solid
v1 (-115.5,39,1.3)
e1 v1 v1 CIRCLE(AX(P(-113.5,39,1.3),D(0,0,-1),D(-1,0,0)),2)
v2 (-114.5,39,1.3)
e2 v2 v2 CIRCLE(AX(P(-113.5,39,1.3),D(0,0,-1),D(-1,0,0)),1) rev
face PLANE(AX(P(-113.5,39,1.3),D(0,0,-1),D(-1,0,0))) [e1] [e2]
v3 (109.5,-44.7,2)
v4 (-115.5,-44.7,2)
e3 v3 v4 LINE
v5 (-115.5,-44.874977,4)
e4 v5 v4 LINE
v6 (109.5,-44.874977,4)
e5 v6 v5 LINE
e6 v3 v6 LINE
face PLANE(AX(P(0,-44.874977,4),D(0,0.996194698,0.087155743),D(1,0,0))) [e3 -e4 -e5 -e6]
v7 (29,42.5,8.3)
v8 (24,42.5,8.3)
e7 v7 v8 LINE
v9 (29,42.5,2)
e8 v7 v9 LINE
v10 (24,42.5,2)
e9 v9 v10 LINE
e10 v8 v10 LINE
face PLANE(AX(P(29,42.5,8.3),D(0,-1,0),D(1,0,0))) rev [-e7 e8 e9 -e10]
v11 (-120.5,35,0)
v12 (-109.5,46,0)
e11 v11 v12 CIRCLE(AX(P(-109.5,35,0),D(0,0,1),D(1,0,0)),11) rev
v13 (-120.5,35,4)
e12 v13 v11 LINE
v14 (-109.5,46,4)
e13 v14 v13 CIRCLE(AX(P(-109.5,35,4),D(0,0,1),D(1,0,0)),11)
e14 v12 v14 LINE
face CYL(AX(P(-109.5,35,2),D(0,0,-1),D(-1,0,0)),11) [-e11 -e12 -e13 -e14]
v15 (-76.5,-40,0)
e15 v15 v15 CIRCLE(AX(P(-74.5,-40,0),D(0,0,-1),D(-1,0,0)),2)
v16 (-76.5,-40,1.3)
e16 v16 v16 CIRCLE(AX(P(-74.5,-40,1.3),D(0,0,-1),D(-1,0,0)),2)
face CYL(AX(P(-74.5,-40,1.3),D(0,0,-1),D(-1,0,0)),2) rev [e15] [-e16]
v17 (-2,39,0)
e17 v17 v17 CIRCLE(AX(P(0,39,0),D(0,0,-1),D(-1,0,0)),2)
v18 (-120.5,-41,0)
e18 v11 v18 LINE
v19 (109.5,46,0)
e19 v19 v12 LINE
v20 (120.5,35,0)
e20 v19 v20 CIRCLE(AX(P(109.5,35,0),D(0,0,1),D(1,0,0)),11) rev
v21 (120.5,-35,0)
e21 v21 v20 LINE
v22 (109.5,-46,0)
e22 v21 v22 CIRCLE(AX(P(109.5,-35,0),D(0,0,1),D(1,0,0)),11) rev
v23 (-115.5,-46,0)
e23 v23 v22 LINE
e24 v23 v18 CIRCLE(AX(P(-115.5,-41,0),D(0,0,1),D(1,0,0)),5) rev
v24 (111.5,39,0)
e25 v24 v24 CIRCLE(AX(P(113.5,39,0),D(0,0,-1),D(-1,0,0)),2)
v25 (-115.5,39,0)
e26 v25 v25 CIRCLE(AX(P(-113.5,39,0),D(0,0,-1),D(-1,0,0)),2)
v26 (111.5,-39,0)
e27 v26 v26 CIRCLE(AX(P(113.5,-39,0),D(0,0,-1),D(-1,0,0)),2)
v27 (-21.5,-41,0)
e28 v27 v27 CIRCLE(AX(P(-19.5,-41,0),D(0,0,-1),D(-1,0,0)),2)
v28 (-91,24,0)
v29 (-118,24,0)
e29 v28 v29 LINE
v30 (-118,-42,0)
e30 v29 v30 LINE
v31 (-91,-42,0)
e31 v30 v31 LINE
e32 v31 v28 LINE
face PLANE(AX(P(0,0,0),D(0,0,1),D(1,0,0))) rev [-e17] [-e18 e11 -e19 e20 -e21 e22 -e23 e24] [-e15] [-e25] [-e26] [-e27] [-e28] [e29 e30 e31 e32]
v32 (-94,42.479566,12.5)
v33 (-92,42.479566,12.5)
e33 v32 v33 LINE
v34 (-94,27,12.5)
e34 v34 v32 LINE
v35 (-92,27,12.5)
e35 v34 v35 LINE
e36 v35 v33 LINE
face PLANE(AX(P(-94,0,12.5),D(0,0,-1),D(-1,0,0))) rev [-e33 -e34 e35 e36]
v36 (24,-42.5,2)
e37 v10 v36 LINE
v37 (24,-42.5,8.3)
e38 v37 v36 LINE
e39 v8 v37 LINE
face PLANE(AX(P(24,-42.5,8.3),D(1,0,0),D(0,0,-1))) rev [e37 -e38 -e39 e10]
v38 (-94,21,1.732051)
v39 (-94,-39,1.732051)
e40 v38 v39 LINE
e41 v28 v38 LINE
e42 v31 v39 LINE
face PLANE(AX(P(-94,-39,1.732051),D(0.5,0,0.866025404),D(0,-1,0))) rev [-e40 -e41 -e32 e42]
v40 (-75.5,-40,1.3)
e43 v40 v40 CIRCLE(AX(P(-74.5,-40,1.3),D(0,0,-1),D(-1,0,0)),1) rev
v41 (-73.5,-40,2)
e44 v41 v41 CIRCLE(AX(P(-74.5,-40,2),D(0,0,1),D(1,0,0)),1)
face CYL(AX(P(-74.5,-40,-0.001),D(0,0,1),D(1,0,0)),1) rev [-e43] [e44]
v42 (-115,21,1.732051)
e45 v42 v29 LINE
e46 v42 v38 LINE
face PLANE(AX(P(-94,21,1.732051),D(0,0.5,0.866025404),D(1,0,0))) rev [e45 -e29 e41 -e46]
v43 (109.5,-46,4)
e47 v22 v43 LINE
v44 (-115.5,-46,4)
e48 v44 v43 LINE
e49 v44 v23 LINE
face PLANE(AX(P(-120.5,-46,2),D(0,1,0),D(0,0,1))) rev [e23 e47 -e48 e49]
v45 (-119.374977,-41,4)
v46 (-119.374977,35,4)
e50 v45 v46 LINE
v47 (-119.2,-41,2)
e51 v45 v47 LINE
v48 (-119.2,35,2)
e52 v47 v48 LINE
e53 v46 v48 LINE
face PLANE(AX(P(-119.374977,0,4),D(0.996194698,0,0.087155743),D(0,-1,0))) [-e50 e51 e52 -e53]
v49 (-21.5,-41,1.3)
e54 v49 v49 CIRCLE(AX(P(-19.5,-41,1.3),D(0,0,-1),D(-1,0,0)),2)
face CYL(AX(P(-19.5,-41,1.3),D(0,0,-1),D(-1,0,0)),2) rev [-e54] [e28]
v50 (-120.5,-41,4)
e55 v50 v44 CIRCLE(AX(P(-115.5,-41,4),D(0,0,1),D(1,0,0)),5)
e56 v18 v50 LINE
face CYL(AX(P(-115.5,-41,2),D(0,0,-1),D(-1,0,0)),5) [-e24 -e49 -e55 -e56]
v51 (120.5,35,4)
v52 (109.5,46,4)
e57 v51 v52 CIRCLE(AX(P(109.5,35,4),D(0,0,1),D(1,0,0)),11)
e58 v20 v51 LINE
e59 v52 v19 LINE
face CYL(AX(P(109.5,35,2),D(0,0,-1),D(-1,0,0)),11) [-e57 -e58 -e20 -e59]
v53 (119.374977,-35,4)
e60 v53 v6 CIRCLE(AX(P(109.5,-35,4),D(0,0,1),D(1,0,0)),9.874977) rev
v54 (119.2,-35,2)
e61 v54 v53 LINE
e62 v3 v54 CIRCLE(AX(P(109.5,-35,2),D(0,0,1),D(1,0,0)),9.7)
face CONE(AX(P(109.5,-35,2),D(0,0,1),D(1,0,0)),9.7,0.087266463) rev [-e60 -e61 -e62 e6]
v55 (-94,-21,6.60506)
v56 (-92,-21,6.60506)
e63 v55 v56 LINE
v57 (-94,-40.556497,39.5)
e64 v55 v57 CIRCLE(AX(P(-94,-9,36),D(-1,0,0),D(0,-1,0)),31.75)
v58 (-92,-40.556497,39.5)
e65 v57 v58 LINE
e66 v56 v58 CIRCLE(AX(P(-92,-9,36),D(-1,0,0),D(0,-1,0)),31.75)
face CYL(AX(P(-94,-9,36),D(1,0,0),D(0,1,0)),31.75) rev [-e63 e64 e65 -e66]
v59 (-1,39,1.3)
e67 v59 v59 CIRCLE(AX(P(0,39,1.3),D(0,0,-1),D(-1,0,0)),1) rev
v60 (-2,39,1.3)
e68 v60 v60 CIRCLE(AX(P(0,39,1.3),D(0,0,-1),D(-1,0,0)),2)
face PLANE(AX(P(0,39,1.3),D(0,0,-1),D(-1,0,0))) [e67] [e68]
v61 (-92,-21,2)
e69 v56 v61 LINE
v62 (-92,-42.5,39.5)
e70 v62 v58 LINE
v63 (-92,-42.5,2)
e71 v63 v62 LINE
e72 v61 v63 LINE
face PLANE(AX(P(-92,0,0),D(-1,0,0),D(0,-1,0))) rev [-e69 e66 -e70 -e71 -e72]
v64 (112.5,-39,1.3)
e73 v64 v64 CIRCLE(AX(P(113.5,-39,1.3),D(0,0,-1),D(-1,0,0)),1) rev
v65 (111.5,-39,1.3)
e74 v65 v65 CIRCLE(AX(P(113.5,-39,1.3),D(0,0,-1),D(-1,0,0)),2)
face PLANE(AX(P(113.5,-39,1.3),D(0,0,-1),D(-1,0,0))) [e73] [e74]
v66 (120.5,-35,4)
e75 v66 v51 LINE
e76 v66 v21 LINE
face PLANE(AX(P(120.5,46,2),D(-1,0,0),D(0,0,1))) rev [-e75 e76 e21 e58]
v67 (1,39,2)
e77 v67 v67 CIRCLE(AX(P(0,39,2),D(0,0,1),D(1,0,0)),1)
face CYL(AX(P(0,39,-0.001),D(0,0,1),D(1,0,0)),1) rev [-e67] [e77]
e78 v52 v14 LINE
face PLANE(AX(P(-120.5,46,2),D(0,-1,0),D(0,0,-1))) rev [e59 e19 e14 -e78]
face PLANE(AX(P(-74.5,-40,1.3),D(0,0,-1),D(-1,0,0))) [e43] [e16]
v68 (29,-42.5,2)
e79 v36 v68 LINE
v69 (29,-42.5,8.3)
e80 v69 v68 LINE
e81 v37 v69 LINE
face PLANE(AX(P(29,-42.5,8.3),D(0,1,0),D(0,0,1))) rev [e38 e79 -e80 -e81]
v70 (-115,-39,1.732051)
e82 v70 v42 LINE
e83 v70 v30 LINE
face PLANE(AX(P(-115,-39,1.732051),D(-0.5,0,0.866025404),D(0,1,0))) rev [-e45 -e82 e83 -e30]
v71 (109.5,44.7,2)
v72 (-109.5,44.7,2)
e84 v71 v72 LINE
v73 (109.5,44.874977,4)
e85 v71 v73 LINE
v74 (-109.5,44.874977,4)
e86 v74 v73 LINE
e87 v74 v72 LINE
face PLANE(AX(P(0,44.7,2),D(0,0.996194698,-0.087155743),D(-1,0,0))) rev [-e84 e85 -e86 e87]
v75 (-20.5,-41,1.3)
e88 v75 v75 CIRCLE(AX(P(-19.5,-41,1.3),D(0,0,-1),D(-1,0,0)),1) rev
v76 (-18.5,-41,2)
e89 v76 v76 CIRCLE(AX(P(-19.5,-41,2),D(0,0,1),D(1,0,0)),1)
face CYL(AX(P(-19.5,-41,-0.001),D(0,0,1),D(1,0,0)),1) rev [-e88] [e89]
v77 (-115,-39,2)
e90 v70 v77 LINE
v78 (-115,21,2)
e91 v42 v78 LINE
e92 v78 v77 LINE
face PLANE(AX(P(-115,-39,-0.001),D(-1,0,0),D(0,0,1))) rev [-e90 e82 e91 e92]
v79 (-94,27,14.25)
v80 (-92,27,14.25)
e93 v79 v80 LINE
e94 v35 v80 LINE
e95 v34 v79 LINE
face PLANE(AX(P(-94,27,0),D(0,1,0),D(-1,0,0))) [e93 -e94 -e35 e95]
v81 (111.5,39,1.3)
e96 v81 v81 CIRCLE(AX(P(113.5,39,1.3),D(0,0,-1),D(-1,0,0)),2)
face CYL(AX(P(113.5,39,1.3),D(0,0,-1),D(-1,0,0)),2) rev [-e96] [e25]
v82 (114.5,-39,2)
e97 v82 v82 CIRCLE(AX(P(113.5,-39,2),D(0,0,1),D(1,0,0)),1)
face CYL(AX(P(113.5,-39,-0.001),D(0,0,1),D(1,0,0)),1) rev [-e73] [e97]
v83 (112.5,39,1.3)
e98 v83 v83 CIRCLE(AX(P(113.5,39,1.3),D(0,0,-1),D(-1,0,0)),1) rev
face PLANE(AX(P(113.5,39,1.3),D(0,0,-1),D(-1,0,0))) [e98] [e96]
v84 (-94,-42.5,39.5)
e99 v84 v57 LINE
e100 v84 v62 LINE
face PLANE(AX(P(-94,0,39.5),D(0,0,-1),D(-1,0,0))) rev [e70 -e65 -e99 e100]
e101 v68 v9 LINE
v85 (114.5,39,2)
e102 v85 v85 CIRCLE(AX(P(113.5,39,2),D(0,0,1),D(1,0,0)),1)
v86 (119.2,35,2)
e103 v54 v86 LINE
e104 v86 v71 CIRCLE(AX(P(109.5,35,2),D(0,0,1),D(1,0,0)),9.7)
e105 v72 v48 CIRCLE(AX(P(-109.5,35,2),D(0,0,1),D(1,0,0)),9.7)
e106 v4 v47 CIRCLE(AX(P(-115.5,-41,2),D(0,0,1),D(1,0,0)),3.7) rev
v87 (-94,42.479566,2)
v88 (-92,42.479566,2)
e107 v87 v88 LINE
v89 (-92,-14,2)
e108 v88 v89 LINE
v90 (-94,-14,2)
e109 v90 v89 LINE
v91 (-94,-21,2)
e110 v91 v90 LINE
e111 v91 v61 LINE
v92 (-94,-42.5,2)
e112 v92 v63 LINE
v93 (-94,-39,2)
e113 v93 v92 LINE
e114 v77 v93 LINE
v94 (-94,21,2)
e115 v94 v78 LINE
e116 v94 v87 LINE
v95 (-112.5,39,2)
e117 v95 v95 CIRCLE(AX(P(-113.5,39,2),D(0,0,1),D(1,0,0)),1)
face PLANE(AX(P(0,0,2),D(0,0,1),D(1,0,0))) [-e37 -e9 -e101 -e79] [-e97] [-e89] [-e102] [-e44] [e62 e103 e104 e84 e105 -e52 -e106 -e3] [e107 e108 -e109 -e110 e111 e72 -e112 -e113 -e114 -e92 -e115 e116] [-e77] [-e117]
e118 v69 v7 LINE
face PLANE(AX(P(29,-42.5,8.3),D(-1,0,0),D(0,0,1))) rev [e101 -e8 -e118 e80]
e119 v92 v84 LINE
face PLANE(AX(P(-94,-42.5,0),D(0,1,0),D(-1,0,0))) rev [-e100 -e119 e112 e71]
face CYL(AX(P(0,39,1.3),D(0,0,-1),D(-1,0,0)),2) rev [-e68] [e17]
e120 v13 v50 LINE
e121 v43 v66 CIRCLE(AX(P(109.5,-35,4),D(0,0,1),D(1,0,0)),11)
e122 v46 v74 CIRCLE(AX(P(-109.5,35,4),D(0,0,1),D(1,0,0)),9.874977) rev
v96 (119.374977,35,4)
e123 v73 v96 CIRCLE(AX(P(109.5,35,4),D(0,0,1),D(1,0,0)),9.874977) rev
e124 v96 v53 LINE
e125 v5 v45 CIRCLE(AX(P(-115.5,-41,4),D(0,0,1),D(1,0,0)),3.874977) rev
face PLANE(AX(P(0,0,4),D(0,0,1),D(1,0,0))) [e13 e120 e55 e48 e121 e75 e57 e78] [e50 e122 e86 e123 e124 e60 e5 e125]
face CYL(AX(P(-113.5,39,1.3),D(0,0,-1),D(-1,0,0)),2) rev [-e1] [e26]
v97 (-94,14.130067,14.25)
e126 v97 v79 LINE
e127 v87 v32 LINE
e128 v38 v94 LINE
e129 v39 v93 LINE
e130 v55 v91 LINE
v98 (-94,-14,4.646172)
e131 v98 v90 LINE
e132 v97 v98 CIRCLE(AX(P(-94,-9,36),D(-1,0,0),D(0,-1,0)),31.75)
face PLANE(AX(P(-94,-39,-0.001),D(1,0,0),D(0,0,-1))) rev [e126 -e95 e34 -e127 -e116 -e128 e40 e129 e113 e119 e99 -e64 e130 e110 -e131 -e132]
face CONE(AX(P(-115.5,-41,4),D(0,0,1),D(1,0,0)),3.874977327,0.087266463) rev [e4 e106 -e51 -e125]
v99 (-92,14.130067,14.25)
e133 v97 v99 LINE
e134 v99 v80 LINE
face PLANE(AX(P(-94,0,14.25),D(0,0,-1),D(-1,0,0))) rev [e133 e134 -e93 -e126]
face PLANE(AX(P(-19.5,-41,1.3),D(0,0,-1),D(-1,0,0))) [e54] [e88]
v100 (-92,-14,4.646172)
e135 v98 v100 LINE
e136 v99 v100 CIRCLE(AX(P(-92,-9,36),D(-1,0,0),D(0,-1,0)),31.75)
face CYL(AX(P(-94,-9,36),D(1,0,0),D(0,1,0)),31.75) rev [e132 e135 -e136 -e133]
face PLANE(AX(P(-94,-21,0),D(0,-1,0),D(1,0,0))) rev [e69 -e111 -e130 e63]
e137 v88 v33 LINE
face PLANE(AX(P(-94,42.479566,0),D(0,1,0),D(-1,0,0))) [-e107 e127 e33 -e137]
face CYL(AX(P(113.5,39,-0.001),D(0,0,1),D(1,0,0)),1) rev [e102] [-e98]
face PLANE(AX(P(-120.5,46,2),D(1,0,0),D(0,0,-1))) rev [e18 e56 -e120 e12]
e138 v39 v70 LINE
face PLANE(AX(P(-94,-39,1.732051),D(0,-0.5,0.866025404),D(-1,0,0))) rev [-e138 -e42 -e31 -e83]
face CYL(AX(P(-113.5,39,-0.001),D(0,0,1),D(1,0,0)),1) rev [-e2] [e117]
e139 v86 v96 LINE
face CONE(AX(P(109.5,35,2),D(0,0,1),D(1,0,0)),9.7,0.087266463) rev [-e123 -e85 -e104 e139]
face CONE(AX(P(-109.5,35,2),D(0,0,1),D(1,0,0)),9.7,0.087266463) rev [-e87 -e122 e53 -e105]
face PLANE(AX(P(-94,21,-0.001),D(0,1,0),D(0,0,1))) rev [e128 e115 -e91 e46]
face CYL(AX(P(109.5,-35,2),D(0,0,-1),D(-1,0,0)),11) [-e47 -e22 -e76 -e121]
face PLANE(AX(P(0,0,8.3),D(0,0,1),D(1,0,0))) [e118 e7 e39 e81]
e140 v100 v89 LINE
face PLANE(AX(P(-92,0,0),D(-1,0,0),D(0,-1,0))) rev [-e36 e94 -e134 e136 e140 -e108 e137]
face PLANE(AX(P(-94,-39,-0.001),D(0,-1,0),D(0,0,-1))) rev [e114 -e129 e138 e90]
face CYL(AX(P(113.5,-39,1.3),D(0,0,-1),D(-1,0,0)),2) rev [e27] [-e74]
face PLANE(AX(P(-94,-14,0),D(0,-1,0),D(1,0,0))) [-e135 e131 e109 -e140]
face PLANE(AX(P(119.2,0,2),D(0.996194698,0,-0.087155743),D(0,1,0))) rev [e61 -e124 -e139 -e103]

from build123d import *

# Parameters (mm, degrees)
SKETCH_1_W          = 241
SKETCH_1_H          = 92
EXTRUDE_1_DEPTH     = 2
FILLET_1_R          = 5
FILLET_2_R          = 11
CUT_EXTRUDE_1_REACH = 130.997
SKETCH_3_R          = 1
SKETCH_4_R          = 2
CUT_EXTRUDE_2_DEPTH = 1.3
EXTRUDE_START       = 2
EXTRUDE_2_DEPTH     = 2
CHAMFER_1_SIZE      = 0.174977327
CHAMFER_1_SIZE_2    = 2
SKETCH_6_W          = 5
SKETCH_6_H          = 85
EXTRUDE_3_DEPTH     = 6.3
CUT_EXTRUDE_3_REACH = 131.135
SKETCH_7_W          = 21
SKETCH_7_H          = 60
EXTRUDE_START_2     = -28.5
EXTRUDE_4_DEPTH     = 2
CHAMFER_2_SIZE      = 3
CHAMFER_2_SIZE2     = 1.732050808


with BuildPart() as part:
    # 草图1 → 凸台-拉伸1 (new body)
    with BuildSketch(Plane.XY):
        Rectangle(SKETCH_1_W, SKETCH_1_H)
    extrude(amount=EXTRUDE_1_DEPTH)

    # 圆角1
    fillet_1_edges = [part.edges().sort_by_distance(p)[0] for p in [
        (-120.5, -46, 1),
    ]]
    fillet(fillet_1_edges, radius=FILLET_1_R)

    # 圆角2
    fillet_2_edges = [part.edges().sort_by_distance(p)[0] for p in [
        (120.5, -46, 1),
        (-120.5, 46, 1),
        (120.5, 46, 1),
    ]]
    fillet(fillet_2_edges, radius=FILLET_2_R)

    # 草图3 → 切除-拉伸1 (cut, up to next)
    with BuildSketch(Plane.XY.offset(2), mode=Mode.PRIVATE) as cut_extrude_1_sk1:
        with Locations((-19.5, -41)):
            Circle(SKETCH_3_R)
    cut_extrude_1_tool1 = extrude(cut_extrude_1_sk1.sketch, amount=-CUT_EXTRUDE_1_REACH, mode=Mode.PRIVATE) & part.part
    # 草图3 → 切除-拉伸1 (cut, up to next)
    with BuildSketch(Plane.XY.offset(2), mode=Mode.PRIVATE) as cut_extrude_1_sk2:
        with Locations((-74.5, -40)):
            Circle(SKETCH_3_R)
    cut_extrude_1_tool2 = extrude(cut_extrude_1_sk2.sketch, amount=-CUT_EXTRUDE_1_REACH, mode=Mode.PRIVATE) & part.part
    # 草图3 → 切除-拉伸1 (cut, up to next)
    with BuildSketch(Plane.XY.offset(2), mode=Mode.PRIVATE) as cut_extrude_1_sk3:
        with Locations((-113.5, 39)):
            Circle(SKETCH_3_R)
    cut_extrude_1_tool3 = extrude(cut_extrude_1_sk3.sketch, amount=-CUT_EXTRUDE_1_REACH, mode=Mode.PRIVATE) & part.part
    # 草图3 → 切除-拉伸1 (cut, up to next)
    with BuildSketch(Plane.XY.offset(2), mode=Mode.PRIVATE) as cut_extrude_1_sk4:
        with Locations((0, 39)):
            Circle(SKETCH_3_R)
    cut_extrude_1_tool4 = extrude(cut_extrude_1_sk4.sketch, amount=-CUT_EXTRUDE_1_REACH, mode=Mode.PRIVATE) & part.part
    # 草图3 → 切除-拉伸1 (cut, up to next)
    with BuildSketch(Plane.XY.offset(2), mode=Mode.PRIVATE) as cut_extrude_1_sk5:
        with Locations((113.5, -39)):
            Circle(SKETCH_3_R)
    cut_extrude_1_tool5 = extrude(cut_extrude_1_sk5.sketch, amount=-CUT_EXTRUDE_1_REACH, mode=Mode.PRIVATE) & part.part
    # 草图3 → 切除-拉伸1 (cut, up to next)
    with BuildSketch(Plane.XY.offset(2), mode=Mode.PRIVATE) as cut_extrude_1_sk6:
        with Locations((113.5, 39)):
            Circle(SKETCH_3_R)
    cut_extrude_1_tool6 = extrude(cut_extrude_1_sk6.sketch, amount=-CUT_EXTRUDE_1_REACH, mode=Mode.PRIVATE) & part.part
    add(cut_extrude_1_tool1.solids().sort_by_distance((-19.5, -41, 2))[0], mode=Mode.SUBTRACT)
    add(cut_extrude_1_tool2.solids().sort_by_distance((-74.5, -40, 2))[0], mode=Mode.SUBTRACT)
    add(cut_extrude_1_tool3.solids().sort_by_distance((-113.5, 39, 2))[0], mode=Mode.SUBTRACT)
    add(cut_extrude_1_tool4.solids().sort_by_distance((0, 39, 2))[0], mode=Mode.SUBTRACT)
    add(cut_extrude_1_tool5.solids().sort_by_distance((113.5, -39, 2))[0], mode=Mode.SUBTRACT)
    add(cut_extrude_1_tool6.solids().sort_by_distance((113.5, 39, 2))[0], mode=Mode.SUBTRACT)

    # 草图4 → 切除-拉伸2 (cut)
    with BuildSketch(Plane(origin=(0, 0, 0), x_dir=(-1, 0, 0), z_dir=(0, 0, -1))):
        with Locations((74.5, -40)):
            Circle(SKETCH_4_R)
        with Locations((19.5, -41)):
            Circle(SKETCH_4_R)
        with Locations((-113.5, -39)):
            Circle(SKETCH_4_R)
        with Locations((-113.5, 39)):
            Circle(SKETCH_4_R)
        with Locations((0, 39)):
            Circle(SKETCH_4_R)
        with Locations((113.5, 39)):
            Circle(SKETCH_4_R)
    extrude(amount=-CUT_EXTRUDE_2_DEPTH, mode=Mode.SUBTRACT)

    # 草图5 → 凸台-拉伸2 (add)
    with BuildSketch(Plane.XY.offset(2).offset(EXTRUDE_START)):
        with BuildLine():
            ThreePointArc((-120.5, -41), (-119.035533906, -44.535533906), (-115.5, -46))
            Line((-115.5, -46), (109.5, -46))
            ThreePointArc((109.5, -46), (117.278174593, -42.778174593), (120.5, -35))
            Line((120.5, -35), (120.5, 35))
            ThreePointArc((120.5, 35), (117.278174593, 42.778174593), (109.5, 46))
            Line((109.5, 46), (-109.5, 46))
            ThreePointArc((-109.5, 46), (-117.278174593, 42.778174593), (-120.5, 35))
            Line((-120.5, 35), (-120.5, -41))
        make_face()
        with BuildLine():
            Line((109.5, -44.7), (-115.5, -44.7))
            ThreePointArc((-115.5, -44.7), (-118.11629509, -43.61629509), (-119.2, -41))
            Line((-119.2, -41), (-119.2, 35))
            ThreePointArc((-119.2, 35), (-116.358935778, 41.858935778), (-109.5, 44.7))
            Line((-109.5, 44.7), (109.5, 44.7))
            ThreePointArc((109.5, 44.7), (116.358935778, 41.858935778), (119.2, 35))
            Line((119.2, 35), (119.2, -35))
            ThreePointArc((119.2, -35), (116.358935778, -41.858935778), (109.5, -44.7))
        make_face(mode=Mode.SUBTRACT)
    extrude(amount=-EXTRUDE_2_DEPTH)

    # 倒角1
    # the kernel refuses this chamfer: 2, 0.174977327 mm, written as the material it takes off along each edge
    with BuildSketch(Plane(origin=(-109.5, 44.7, 4), x_dir=(0, 0.9159861691531133, 0.40120984275090293), z_dir=(1, 0, 0))) as chamfer_1_piece_1_section:
        Polygon((CHAMFER_1_SIZE * 0.915986169425, -CHAMFER_1_SIZE * 0.40120984287), (-CHAMFER_1_SIZE_2 * 0.401209842751, -CHAMFER_1_SIZE_2 * 0.915986169153), (0, 0), align=None)
    chamfer_1_piece_1 = extrude(amount=219, mode=Mode.PRIVATE)
    chamfer_1_piece_1 = split(chamfer_1_piece_1, bisect_by=Plane(origin=(0, 44.735649873, 2), z_dir=(0, 0, 1)), keep=Keep.TOP, mode=Mode.PRIVATE)
    add(chamfer_1_piece_1, mode=Mode.SUBTRACT)
    with BuildSketch(Plane(origin=(109.5, 35, 4), x_dir=(0, 1, 0), z_dir=(-1, 0, 0))) as chamfer_1_piece_2_section:
        Polygon((9.7 + CHAMFER_1_SIZE, 0), (9.7, CHAMFER_1_SIZE_2), (9.7, 0), align=None)
    chamfer_1_piece_2 = revolve(axis=Axis((109.5, 35, 4), (0, 0, -1)), revolution_arc=90, mode=Mode.PRIVATE)
    chamfer_1_piece_2 = split(chamfer_1_piece_2, bisect_by=Plane(origin=(116.41200817, 41.91200817, 2), z_dir=(0, 0, 1)), keep=Keep.TOP, mode=Mode.PRIVATE)
    add(chamfer_1_piece_2, mode=Mode.SUBTRACT)
    with BuildSketch(Plane(origin=(-109.5, 35, 4), x_dir=(-1, 0, 0), z_dir=(0, -1, 0))) as chamfer_1_piece_3_section:
        Polygon((9.7 + CHAMFER_1_SIZE, 0), (9.7, CHAMFER_1_SIZE_2), (9.7, 0), align=None)
    chamfer_1_piece_3 = revolve(axis=Axis((-109.5, 35, 4), (0, 0, -1)), revolution_arc=90, mode=Mode.PRIVATE)
    chamfer_1_piece_3 = split(chamfer_1_piece_3, bisect_by=Plane(origin=(-116.412008168, 41.912008168, 2), z_dir=(0, 0, 1)), keep=Keep.TOP, mode=Mode.PRIVATE)
    add(chamfer_1_piece_3, mode=Mode.SUBTRACT)
    with BuildSketch(Plane(origin=(119.2, 35, 4), x_dir=(0.9159861691531133, 0, 0.40120984275090293), z_dir=(0, -1, 0))) as chamfer_1_piece_4_section:
        Polygon((CHAMFER_1_SIZE * 0.915986169425, -CHAMFER_1_SIZE * 0.40120984287), (-CHAMFER_1_SIZE_2 * 0.401209842751, -CHAMFER_1_SIZE_2 * 0.915986169153), (0, 0), align=None)
    chamfer_1_piece_4 = extrude(amount=70, mode=Mode.PRIVATE)
    chamfer_1_piece_4 = split(chamfer_1_piece_4, bisect_by=Plane(origin=(119.235649873, 0, 2), z_dir=(0, 0, 1)), keep=Keep.TOP, mode=Mode.PRIVATE)
    add(chamfer_1_piece_4, mode=Mode.SUBTRACT)
    with BuildSketch(Plane(origin=(-119.2, -41, 4), x_dir=(-0.9159861691531133, 0, 0.40120984275090293), z_dir=(0, 1, 0))) as chamfer_1_piece_5_section:
        Polygon((CHAMFER_1_SIZE * 0.915986169425, -CHAMFER_1_SIZE * 0.40120984287), (-CHAMFER_1_SIZE_2 * 0.401209842751, -CHAMFER_1_SIZE_2 * 0.915986169153), (0, 0), align=None)
    chamfer_1_piece_5 = extrude(amount=76, mode=Mode.PRIVATE)
    chamfer_1_piece_5 = split(chamfer_1_piece_5, bisect_by=Plane(origin=(-119.235649873, -3, 2), z_dir=(0, 0, 1)), keep=Keep.TOP, mode=Mode.PRIVATE)
    add(chamfer_1_piece_5, mode=Mode.SUBTRACT)
    with BuildSketch(Plane(origin=(109.5, -35, 4), x_dir=(1, 0, 0), z_dir=(0, 1, 0))) as chamfer_1_piece_6_section:
        Polygon((9.7 + CHAMFER_1_SIZE, 0), (9.7, CHAMFER_1_SIZE_2), (9.7, 0), align=None)
    chamfer_1_piece_6 = revolve(axis=Axis((109.5, -35, 4), (0, 0, -1)), revolution_arc=90, mode=Mode.PRIVATE)
    chamfer_1_piece_6 = split(chamfer_1_piece_6, bisect_by=Plane(origin=(116.41200817, -41.91200817, 2), z_dir=(0, 0, 1)), keep=Keep.TOP, mode=Mode.PRIVATE)
    add(chamfer_1_piece_6, mode=Mode.SUBTRACT)
    with BuildSketch(Plane(origin=(-115.5, -41, 4), x_dir=(0, -1, 0), z_dir=(1, 0, 0))) as chamfer_1_piece_7_section:
        Polygon((3.7 + CHAMFER_1_SIZE, 0), (3.7, CHAMFER_1_SIZE_2), (3.7, 0), align=None)
    chamfer_1_piece_7 = revolve(axis=Axis((-115.5, -41, 4), (0, 0, -1)), revolution_arc=90, mode=Mode.PRIVATE)
    chamfer_1_piece_7 = split(chamfer_1_piece_7, bisect_by=Plane(origin=(-118.172444307, -43.672444307, 2), z_dir=(0, 0, 1)), keep=Keep.TOP, mode=Mode.PRIVATE)
    add(chamfer_1_piece_7, mode=Mode.SUBTRACT)
    with BuildSketch(Plane(origin=(109.5, -44.7, 4), x_dir=(0, -0.9159861691531133, 0.40120984275090293), z_dir=(-1, 0, 0))) as chamfer_1_piece_8_section:
        Polygon((CHAMFER_1_SIZE * 0.915986169425, -CHAMFER_1_SIZE * 0.40120984287), (-CHAMFER_1_SIZE_2 * 0.401209842751, -CHAMFER_1_SIZE_2 * 0.915986169153), (0, 0), align=None)
    chamfer_1_piece_8 = extrude(amount=225, mode=Mode.PRIVATE)
    chamfer_1_piece_8 = split(chamfer_1_piece_8, bisect_by=Plane(origin=(-3, -44.735649873, 2), z_dir=(0, 0, 1)), keep=Keep.TOP, mode=Mode.PRIVATE)
    add(chamfer_1_piece_8, mode=Mode.SUBTRACT)

    # 草图6 → 凸台-拉伸3 (add)
    with BuildSketch(Plane.XY.offset(2)):
        with Locations((26.5, 0)):
            Rectangle(SKETCH_6_W, SKETCH_6_H)
    extrude(amount=EXTRUDE_3_DEPTH)

    # 草图7 → 切除-拉伸3 (cut, up to next)
    with BuildSketch(Plane.XY.offset(2), mode=Mode.PRIVATE) as cut_extrude_3_sk1:
        with Locations((-104.5, -9)):
            Rectangle(SKETCH_7_W, SKETCH_7_H)
    cut_extrude_3_tool1 = extrude(cut_extrude_3_sk1.sketch, amount=-CUT_EXTRUDE_3_REACH, mode=Mode.PRIVATE) & part.part
    add(cut_extrude_3_tool1.solids().sort_by_distance((-104.5, -9, 2))[0], mode=Mode.SUBTRACT)

    # 草图8 → 凸台-拉伸4 (add)
    with BuildSketch(Plane.ZY.offset(120.5).offset(EXTRUDE_START_2)):
        with BuildLine():
            Line((2, -21), (2, -42.5))
            Line((2, -42.5), (39.5, -42.5))
            Line((39.5, -42.5), (39.5, -40.556496954))
            ThreePointArc((39.5, -40.556496954), (19.774984647, -36.291232599), (6.605059959, -21))
            Line((6.605059959, -21), (2, -21))
        make_face()
        with BuildLine():
            Line((2, -14), (4.646172482, -14))
            ThreePointArc((4.646172482, -14), (5.952882138, 1.25832385), (14.25, 14.130067012))
            Line((14.25, 14.130067012), (14.25, 27))
            Line((14.25, 27), (12.5, 27))
            Line((12.5, 27), (12.5, 42.479565739))
            Line((12.5, 42.479565739), (2, 42.479565739))
            Line((2, 42.479565739), (2, -14))
        make_face()
    extrude(amount=EXTRUDE_4_DEPTH)

    # 倒角2
    chamfer_2_edges = [part.edges().sort_by_distance(p)[0] for p in [
        (-104.5, -39, 0),
        (-115, -9, 0),
        (-104.5, 21, 0),
        (-94, -9, 0),
    ]]
    chamfer_2_side = [part.faces().sort_by_distance(p)[0] for p in [
        (6.21588018, 0.505356203, 0),
    ]]
    chamfer(chamfer_2_edges, length=CHAMFER_2_SIZE, length2=CHAMFER_2_SIZE2, reference=chamfer_2_side[0])


solid = part.part
